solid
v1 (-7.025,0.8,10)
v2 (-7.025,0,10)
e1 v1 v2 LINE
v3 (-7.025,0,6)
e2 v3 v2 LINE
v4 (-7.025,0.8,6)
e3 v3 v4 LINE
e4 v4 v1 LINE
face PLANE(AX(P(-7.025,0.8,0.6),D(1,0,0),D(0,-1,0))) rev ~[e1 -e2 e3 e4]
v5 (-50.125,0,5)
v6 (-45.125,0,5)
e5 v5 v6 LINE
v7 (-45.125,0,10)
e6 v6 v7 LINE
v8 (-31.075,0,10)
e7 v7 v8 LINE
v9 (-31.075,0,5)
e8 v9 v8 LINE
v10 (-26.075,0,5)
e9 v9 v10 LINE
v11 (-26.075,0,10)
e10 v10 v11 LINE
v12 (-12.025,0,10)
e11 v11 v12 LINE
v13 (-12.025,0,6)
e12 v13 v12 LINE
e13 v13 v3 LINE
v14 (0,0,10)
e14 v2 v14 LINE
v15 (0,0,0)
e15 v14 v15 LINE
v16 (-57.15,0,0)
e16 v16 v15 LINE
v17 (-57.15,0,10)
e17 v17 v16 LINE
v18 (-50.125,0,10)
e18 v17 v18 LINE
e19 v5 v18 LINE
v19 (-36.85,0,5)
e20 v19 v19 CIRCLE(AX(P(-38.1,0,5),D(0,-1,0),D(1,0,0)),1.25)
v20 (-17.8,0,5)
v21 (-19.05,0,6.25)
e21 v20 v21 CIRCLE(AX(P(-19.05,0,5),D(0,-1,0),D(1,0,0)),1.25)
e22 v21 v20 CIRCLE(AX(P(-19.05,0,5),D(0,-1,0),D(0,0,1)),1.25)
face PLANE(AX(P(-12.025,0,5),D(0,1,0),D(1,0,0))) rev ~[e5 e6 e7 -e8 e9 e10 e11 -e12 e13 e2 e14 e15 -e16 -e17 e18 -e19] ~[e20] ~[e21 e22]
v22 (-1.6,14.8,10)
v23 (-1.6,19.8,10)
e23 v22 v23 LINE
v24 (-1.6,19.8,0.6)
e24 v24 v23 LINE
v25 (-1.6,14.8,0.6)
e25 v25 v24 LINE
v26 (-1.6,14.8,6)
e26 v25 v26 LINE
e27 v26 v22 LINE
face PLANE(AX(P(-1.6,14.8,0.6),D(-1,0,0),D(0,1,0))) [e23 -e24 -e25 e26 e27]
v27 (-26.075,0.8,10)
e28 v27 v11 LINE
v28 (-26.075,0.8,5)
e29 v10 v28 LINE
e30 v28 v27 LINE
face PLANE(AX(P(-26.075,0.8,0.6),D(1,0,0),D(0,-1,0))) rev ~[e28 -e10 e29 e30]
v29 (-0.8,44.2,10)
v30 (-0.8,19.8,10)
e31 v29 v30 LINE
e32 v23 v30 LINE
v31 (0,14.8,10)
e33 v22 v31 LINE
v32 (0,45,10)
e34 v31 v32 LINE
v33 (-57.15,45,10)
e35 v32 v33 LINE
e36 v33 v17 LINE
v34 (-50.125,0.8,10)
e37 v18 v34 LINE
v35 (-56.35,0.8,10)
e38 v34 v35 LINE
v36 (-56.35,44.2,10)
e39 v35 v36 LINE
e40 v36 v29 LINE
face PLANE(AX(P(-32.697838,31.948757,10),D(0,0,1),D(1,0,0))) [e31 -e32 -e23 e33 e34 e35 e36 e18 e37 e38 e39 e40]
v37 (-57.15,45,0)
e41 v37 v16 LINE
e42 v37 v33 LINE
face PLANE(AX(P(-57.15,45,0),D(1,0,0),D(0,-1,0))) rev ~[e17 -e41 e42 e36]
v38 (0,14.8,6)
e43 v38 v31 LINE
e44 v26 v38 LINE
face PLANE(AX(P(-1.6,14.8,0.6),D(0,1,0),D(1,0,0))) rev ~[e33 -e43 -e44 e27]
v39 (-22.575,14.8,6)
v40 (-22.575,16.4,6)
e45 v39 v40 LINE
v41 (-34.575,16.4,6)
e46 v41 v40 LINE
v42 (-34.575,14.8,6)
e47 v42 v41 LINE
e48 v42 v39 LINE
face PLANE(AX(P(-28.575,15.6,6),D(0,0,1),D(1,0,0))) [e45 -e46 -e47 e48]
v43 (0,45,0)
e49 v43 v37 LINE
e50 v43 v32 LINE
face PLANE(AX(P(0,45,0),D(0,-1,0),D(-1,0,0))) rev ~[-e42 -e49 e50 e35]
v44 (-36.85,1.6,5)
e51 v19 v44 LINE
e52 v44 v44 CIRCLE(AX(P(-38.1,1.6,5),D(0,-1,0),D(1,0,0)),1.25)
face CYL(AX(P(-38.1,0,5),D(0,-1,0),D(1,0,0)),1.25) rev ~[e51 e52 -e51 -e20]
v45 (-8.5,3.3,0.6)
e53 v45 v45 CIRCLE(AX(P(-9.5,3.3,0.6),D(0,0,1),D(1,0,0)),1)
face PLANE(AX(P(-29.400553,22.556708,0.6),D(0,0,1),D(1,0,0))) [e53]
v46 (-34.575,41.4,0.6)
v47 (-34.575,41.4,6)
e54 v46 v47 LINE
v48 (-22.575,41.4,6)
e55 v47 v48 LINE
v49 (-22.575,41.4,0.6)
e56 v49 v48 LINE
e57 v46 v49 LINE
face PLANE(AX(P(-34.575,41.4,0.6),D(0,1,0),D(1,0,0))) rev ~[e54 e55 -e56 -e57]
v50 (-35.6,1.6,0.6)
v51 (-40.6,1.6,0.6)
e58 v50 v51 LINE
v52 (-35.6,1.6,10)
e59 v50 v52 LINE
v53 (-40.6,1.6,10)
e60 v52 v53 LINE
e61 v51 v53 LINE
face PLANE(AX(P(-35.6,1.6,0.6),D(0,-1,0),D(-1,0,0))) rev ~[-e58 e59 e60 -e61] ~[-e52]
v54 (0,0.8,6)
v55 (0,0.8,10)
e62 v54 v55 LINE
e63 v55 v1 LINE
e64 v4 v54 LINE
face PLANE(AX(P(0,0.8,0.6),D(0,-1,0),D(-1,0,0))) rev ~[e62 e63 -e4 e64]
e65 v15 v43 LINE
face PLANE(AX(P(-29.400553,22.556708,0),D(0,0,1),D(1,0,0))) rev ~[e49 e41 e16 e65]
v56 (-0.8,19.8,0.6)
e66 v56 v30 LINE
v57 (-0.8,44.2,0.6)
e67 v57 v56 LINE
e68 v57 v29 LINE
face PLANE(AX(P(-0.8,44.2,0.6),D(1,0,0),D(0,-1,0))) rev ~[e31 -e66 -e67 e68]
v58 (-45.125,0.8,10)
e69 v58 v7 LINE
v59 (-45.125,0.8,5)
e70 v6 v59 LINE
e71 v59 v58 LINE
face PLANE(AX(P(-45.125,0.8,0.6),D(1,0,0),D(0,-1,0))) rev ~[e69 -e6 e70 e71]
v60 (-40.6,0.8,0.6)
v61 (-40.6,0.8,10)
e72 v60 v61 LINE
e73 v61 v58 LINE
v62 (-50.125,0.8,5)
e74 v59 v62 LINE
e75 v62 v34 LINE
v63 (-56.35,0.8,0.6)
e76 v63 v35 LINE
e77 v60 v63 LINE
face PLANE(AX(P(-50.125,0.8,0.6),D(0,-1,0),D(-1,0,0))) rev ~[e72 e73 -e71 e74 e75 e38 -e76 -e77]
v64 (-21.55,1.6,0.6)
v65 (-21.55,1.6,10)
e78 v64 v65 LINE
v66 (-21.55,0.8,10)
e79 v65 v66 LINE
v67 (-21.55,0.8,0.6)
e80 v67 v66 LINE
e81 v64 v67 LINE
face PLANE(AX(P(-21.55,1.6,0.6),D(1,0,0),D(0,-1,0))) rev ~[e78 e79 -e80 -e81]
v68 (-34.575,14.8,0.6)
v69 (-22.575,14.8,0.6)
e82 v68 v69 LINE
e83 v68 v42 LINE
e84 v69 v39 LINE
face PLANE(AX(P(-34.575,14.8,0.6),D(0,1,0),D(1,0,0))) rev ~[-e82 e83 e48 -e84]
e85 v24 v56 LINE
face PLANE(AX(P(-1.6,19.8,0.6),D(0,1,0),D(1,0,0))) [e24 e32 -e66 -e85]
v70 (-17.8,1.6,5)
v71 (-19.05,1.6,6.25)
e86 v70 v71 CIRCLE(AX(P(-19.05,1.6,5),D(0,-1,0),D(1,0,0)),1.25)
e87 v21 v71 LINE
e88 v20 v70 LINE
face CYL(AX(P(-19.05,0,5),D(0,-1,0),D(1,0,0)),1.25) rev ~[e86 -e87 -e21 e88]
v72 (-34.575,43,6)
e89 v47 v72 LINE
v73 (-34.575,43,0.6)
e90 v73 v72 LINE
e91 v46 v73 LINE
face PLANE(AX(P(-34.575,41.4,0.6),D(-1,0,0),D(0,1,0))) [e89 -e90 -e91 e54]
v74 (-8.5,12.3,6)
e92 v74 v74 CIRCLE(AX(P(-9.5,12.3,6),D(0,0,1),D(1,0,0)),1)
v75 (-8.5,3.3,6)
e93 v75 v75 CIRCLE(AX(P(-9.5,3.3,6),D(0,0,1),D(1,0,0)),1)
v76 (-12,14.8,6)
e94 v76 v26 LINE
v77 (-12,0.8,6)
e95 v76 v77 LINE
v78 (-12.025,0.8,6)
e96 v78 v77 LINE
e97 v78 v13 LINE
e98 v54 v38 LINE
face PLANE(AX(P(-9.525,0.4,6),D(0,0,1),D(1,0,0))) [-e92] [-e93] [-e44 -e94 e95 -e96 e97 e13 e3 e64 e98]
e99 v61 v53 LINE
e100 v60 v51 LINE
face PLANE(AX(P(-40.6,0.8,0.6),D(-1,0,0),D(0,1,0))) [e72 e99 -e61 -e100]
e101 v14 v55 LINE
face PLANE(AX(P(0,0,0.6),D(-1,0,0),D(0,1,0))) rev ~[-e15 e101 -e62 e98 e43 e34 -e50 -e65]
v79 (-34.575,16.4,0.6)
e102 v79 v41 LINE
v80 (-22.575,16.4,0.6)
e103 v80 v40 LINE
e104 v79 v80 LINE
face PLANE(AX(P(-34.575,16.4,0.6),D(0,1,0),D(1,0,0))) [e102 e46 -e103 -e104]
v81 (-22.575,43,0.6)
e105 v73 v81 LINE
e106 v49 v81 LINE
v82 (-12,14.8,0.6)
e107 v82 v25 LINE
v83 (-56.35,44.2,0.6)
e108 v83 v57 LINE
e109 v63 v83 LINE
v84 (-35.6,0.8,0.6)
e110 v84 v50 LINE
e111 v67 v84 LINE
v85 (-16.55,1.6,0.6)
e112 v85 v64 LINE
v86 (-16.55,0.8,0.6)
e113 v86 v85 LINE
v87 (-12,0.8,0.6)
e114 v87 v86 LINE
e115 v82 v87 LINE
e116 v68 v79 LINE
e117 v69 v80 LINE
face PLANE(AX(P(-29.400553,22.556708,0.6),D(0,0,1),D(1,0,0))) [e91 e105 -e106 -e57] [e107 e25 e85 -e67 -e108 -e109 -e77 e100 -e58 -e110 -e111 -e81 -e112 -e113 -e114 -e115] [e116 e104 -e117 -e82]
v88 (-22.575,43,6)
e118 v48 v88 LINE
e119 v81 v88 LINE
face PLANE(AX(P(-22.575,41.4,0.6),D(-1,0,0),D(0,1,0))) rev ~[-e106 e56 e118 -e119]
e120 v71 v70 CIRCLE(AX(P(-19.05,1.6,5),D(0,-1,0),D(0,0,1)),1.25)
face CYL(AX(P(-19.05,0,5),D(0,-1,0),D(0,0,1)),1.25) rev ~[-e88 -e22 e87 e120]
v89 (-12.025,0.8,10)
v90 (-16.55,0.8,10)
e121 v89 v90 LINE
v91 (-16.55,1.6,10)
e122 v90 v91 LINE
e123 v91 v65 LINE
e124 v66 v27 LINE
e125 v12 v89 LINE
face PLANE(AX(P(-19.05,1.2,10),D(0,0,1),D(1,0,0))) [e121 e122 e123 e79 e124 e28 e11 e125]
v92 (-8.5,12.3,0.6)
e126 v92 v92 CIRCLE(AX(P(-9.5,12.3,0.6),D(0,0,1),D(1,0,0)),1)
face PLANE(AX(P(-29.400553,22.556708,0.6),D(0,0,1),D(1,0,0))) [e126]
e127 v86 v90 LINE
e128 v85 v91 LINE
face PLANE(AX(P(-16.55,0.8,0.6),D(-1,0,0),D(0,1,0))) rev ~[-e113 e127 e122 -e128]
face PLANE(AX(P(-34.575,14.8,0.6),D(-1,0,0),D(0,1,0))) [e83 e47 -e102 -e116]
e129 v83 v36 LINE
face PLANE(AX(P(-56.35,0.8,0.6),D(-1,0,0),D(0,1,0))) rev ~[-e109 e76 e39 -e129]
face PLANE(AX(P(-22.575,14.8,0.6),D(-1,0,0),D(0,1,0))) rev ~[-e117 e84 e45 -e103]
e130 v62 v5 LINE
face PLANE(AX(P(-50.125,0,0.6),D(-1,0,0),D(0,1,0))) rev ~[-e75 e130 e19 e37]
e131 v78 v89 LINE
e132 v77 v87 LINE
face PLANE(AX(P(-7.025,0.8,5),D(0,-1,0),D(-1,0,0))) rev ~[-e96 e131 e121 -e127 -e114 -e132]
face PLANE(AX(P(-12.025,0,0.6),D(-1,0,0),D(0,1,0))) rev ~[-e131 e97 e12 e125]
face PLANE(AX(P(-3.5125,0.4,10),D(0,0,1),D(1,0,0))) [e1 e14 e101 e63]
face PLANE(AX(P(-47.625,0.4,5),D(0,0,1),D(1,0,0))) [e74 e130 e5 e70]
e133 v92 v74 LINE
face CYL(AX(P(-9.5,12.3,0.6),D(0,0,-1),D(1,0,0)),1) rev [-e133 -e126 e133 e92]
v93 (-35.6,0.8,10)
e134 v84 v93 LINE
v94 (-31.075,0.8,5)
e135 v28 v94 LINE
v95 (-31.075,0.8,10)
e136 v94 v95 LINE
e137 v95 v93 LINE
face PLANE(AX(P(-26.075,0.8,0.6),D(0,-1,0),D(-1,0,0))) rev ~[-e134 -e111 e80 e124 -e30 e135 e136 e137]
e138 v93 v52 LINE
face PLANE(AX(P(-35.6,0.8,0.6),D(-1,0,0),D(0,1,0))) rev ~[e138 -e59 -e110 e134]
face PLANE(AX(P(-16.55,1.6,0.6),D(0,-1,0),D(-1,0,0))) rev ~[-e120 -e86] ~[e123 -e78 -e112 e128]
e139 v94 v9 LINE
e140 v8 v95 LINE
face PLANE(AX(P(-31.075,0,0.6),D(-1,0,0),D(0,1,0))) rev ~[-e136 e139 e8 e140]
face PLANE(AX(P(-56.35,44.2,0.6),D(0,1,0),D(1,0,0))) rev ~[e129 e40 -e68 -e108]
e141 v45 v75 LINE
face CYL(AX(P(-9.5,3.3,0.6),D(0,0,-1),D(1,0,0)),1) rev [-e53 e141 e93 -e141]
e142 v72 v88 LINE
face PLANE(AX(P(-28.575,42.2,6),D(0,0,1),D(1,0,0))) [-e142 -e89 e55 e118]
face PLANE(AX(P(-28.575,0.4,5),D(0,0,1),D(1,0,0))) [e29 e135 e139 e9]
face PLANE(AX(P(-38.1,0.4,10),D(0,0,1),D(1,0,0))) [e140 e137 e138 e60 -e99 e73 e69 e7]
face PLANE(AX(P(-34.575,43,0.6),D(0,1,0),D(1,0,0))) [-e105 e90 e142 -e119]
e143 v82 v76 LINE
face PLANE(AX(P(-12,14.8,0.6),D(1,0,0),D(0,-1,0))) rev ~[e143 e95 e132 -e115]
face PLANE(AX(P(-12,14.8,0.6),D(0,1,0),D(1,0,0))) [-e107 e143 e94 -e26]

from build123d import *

# Parameters (mm, degrees)
F0_W     = 12
F0_H     = 1.6
F0_H_2   = 7
F0_R     = 1
F1_DEPTH = 0.6
F2_W     = 12
F2_H     = 1.6
F2_H_2   = 7
F2_R     = 1
F3_DEPTH = 5.4
F4_W     = 2.5
F4_H     = 0.8
F4_W_2   = 0.8
F4_H_2   = 5
F5_DEPTH = 9.4
F6_DEPTH = 4.4
F7_DEPTH = 1
F8_R     = 1.25
F9_DEPTH = 1.6


# Not quite as in the source:
# - a feature names something its author has since deleted; it is built from what else it names


with BuildPart() as f1:
    # F0 (on Top) → F1 (new body)
    with BuildSketch(Plane.XY):
        Polygon((-57.15, 0), (-12, 0), (-12, 7), (-12, 14), (0, 14), (0, 43), (-22.575, 43), (-22.575, 41.4), (-34.575, 41.4), (-34.575, 43), (-57.15, 43), align=None)
        with Locations((-28.575, 15.6)):
            Rectangle(F0_W, F0_H, mode=Mode.SUBTRACT)
        Polygon((-57.15, 45), (-57.15, 43), (-34.575, 43), (-22.575, 43), (0, 43), (0, 45), align=None)
        with Locations((-6, 10.5)):
            Rectangle(F0_W, F0_H_2)
        with Locations((-9.5, 11.5)):
            Circle(F0_R, mode=Mode.SUBTRACT)
        with Locations((-6, 3.5)):
            Rectangle(F0_W, F0_H_2)
        with Locations((-9.5, 2.5)):
            Circle(F0_R, mode=Mode.SUBTRACT)
        with Locations((-28.575, 42.2)):
            Rectangle(F0_W, F0_H)
        with Locations((-28.575, 15.6)):
            Rectangle(F0_W, F0_H)
        with Locations((-9.5, 11.5)):
            Circle(F0_R)
        with Locations((-9.5, 2.5)):
            Circle(F0_R)
    extrude(amount=F1_DEPTH)

    # F2 (on face) → F3 (join)
    with BuildSketch(Plane.XY.offset(0.6)):
        with Locations((-28.575, 42.2)):
            Rectangle(F2_W, F2_H)
        with Locations((-28.575, 15.6)):
            Rectangle(F2_W, F2_H)
        with Locations((-6, 11.3)):
            Rectangle(F2_W, F2_H_2)
        with Locations((-9.5, 12.3)):
            Circle(F2_R, mode=Mode.SUBTRACT)
        with Locations((-6, 4.3)):
            Rectangle(F2_W, F2_H_2)
        with Locations((-9.5, 3.3)):
            Circle(F2_R, mode=Mode.SUBTRACT)
    extrude(amount=F3_DEPTH)

    # F4 (on face) → F5 (join)
    with BuildSketch(Plane.XY.offset(0.6)):
        Polygon((-45.125, 0.8), (-45.125, 0), (-31.075, 0), (-31.075, 0.8), (-35.6, 0.8), (-38.1, 0.8), (-40.6, 0.8), align=None)
        with Locations((-36.85, 1.2)):
            Rectangle(F4_W, F4_H)
        with Locations((-39.35, 1.2)):
            Rectangle(F4_W, F4_H)
        Polygon((-21.55, 1.6), (-21.55, 0.8), (-16.55, 0.8), (-16.55, 1.6), (-19.05, 1.6), align=None)
        Polygon((-26.075, 0.8), (-26.075, 0), (-12.025, 0), (-12.025, 0.8), (-16.55, 0.8), (-21.55, 0.8), align=None)
        Polygon((0, 0), (0, 0.8), (-0.8, 0.8), (-7.025, 0.8), (-7.025, 0), align=None)
        Polygon((0, 45), (-57.15, 45), (-57.15, 0), (-50.125, 0), (-50.125, 0.8), (-56.35, 0.8), (-56.35, 44.2), (-0.8, 44.2), (-0.8, 19.8), (-0.8, 14.8), (0, 14.8), align=None)
        with Locations((-1.2, 17.3)):
            Rectangle(F4_W_2, F4_H_2)
    extrude(amount=F5_DEPTH)

    # F4 (on face) → F6 (join)
    with BuildSketch(Plane.XY.offset(0.6)):
        Polygon((-31.075, 0.8), (-31.075, 0), (-26.075, 0), (-26.075, 0.8), (-28.575, 0.8), align=None)
        Polygon((-50.125, 0.8), (-50.125, 0), (-45.125, 0), (-45.125, 0.8), (-47.625, 0.8), align=None)
        Polygon((-12.025, 0), (-7.025, 0), (-7.025, 0.8), (-9.525, 0.8), (-12, 0.8), (-12.025, 0.8), align=None)
    extrude(amount=F6_DEPTH)

    # F7 (add): a face of the model
    f7_faces = [f1.faces().sort_by_distance(p)[0] for p in [
        (-9.525, 0.4, 5),
    ]]
    extrude(f7_faces, amount=F7_DEPTH)

    # F8 (on face) → F9 (cut)
    with BuildSketch(Plane.XZ):
        with Locations((-38.1, 5)):
            Circle(F8_R)
        with BuildLine():
            ThreePointArc((-17.8, 5), (-18.1661165235, 5.8838834765), (-19.05, 6.25))
            ThreePointArc((-19.05, 6.25), (-19.9338834765, 4.1161165235), (-17.8, 5))
        make_face()
    extrude(amount=-F9_DEPTH, mode=Mode.SUBTRACT)


solid = f1.part
